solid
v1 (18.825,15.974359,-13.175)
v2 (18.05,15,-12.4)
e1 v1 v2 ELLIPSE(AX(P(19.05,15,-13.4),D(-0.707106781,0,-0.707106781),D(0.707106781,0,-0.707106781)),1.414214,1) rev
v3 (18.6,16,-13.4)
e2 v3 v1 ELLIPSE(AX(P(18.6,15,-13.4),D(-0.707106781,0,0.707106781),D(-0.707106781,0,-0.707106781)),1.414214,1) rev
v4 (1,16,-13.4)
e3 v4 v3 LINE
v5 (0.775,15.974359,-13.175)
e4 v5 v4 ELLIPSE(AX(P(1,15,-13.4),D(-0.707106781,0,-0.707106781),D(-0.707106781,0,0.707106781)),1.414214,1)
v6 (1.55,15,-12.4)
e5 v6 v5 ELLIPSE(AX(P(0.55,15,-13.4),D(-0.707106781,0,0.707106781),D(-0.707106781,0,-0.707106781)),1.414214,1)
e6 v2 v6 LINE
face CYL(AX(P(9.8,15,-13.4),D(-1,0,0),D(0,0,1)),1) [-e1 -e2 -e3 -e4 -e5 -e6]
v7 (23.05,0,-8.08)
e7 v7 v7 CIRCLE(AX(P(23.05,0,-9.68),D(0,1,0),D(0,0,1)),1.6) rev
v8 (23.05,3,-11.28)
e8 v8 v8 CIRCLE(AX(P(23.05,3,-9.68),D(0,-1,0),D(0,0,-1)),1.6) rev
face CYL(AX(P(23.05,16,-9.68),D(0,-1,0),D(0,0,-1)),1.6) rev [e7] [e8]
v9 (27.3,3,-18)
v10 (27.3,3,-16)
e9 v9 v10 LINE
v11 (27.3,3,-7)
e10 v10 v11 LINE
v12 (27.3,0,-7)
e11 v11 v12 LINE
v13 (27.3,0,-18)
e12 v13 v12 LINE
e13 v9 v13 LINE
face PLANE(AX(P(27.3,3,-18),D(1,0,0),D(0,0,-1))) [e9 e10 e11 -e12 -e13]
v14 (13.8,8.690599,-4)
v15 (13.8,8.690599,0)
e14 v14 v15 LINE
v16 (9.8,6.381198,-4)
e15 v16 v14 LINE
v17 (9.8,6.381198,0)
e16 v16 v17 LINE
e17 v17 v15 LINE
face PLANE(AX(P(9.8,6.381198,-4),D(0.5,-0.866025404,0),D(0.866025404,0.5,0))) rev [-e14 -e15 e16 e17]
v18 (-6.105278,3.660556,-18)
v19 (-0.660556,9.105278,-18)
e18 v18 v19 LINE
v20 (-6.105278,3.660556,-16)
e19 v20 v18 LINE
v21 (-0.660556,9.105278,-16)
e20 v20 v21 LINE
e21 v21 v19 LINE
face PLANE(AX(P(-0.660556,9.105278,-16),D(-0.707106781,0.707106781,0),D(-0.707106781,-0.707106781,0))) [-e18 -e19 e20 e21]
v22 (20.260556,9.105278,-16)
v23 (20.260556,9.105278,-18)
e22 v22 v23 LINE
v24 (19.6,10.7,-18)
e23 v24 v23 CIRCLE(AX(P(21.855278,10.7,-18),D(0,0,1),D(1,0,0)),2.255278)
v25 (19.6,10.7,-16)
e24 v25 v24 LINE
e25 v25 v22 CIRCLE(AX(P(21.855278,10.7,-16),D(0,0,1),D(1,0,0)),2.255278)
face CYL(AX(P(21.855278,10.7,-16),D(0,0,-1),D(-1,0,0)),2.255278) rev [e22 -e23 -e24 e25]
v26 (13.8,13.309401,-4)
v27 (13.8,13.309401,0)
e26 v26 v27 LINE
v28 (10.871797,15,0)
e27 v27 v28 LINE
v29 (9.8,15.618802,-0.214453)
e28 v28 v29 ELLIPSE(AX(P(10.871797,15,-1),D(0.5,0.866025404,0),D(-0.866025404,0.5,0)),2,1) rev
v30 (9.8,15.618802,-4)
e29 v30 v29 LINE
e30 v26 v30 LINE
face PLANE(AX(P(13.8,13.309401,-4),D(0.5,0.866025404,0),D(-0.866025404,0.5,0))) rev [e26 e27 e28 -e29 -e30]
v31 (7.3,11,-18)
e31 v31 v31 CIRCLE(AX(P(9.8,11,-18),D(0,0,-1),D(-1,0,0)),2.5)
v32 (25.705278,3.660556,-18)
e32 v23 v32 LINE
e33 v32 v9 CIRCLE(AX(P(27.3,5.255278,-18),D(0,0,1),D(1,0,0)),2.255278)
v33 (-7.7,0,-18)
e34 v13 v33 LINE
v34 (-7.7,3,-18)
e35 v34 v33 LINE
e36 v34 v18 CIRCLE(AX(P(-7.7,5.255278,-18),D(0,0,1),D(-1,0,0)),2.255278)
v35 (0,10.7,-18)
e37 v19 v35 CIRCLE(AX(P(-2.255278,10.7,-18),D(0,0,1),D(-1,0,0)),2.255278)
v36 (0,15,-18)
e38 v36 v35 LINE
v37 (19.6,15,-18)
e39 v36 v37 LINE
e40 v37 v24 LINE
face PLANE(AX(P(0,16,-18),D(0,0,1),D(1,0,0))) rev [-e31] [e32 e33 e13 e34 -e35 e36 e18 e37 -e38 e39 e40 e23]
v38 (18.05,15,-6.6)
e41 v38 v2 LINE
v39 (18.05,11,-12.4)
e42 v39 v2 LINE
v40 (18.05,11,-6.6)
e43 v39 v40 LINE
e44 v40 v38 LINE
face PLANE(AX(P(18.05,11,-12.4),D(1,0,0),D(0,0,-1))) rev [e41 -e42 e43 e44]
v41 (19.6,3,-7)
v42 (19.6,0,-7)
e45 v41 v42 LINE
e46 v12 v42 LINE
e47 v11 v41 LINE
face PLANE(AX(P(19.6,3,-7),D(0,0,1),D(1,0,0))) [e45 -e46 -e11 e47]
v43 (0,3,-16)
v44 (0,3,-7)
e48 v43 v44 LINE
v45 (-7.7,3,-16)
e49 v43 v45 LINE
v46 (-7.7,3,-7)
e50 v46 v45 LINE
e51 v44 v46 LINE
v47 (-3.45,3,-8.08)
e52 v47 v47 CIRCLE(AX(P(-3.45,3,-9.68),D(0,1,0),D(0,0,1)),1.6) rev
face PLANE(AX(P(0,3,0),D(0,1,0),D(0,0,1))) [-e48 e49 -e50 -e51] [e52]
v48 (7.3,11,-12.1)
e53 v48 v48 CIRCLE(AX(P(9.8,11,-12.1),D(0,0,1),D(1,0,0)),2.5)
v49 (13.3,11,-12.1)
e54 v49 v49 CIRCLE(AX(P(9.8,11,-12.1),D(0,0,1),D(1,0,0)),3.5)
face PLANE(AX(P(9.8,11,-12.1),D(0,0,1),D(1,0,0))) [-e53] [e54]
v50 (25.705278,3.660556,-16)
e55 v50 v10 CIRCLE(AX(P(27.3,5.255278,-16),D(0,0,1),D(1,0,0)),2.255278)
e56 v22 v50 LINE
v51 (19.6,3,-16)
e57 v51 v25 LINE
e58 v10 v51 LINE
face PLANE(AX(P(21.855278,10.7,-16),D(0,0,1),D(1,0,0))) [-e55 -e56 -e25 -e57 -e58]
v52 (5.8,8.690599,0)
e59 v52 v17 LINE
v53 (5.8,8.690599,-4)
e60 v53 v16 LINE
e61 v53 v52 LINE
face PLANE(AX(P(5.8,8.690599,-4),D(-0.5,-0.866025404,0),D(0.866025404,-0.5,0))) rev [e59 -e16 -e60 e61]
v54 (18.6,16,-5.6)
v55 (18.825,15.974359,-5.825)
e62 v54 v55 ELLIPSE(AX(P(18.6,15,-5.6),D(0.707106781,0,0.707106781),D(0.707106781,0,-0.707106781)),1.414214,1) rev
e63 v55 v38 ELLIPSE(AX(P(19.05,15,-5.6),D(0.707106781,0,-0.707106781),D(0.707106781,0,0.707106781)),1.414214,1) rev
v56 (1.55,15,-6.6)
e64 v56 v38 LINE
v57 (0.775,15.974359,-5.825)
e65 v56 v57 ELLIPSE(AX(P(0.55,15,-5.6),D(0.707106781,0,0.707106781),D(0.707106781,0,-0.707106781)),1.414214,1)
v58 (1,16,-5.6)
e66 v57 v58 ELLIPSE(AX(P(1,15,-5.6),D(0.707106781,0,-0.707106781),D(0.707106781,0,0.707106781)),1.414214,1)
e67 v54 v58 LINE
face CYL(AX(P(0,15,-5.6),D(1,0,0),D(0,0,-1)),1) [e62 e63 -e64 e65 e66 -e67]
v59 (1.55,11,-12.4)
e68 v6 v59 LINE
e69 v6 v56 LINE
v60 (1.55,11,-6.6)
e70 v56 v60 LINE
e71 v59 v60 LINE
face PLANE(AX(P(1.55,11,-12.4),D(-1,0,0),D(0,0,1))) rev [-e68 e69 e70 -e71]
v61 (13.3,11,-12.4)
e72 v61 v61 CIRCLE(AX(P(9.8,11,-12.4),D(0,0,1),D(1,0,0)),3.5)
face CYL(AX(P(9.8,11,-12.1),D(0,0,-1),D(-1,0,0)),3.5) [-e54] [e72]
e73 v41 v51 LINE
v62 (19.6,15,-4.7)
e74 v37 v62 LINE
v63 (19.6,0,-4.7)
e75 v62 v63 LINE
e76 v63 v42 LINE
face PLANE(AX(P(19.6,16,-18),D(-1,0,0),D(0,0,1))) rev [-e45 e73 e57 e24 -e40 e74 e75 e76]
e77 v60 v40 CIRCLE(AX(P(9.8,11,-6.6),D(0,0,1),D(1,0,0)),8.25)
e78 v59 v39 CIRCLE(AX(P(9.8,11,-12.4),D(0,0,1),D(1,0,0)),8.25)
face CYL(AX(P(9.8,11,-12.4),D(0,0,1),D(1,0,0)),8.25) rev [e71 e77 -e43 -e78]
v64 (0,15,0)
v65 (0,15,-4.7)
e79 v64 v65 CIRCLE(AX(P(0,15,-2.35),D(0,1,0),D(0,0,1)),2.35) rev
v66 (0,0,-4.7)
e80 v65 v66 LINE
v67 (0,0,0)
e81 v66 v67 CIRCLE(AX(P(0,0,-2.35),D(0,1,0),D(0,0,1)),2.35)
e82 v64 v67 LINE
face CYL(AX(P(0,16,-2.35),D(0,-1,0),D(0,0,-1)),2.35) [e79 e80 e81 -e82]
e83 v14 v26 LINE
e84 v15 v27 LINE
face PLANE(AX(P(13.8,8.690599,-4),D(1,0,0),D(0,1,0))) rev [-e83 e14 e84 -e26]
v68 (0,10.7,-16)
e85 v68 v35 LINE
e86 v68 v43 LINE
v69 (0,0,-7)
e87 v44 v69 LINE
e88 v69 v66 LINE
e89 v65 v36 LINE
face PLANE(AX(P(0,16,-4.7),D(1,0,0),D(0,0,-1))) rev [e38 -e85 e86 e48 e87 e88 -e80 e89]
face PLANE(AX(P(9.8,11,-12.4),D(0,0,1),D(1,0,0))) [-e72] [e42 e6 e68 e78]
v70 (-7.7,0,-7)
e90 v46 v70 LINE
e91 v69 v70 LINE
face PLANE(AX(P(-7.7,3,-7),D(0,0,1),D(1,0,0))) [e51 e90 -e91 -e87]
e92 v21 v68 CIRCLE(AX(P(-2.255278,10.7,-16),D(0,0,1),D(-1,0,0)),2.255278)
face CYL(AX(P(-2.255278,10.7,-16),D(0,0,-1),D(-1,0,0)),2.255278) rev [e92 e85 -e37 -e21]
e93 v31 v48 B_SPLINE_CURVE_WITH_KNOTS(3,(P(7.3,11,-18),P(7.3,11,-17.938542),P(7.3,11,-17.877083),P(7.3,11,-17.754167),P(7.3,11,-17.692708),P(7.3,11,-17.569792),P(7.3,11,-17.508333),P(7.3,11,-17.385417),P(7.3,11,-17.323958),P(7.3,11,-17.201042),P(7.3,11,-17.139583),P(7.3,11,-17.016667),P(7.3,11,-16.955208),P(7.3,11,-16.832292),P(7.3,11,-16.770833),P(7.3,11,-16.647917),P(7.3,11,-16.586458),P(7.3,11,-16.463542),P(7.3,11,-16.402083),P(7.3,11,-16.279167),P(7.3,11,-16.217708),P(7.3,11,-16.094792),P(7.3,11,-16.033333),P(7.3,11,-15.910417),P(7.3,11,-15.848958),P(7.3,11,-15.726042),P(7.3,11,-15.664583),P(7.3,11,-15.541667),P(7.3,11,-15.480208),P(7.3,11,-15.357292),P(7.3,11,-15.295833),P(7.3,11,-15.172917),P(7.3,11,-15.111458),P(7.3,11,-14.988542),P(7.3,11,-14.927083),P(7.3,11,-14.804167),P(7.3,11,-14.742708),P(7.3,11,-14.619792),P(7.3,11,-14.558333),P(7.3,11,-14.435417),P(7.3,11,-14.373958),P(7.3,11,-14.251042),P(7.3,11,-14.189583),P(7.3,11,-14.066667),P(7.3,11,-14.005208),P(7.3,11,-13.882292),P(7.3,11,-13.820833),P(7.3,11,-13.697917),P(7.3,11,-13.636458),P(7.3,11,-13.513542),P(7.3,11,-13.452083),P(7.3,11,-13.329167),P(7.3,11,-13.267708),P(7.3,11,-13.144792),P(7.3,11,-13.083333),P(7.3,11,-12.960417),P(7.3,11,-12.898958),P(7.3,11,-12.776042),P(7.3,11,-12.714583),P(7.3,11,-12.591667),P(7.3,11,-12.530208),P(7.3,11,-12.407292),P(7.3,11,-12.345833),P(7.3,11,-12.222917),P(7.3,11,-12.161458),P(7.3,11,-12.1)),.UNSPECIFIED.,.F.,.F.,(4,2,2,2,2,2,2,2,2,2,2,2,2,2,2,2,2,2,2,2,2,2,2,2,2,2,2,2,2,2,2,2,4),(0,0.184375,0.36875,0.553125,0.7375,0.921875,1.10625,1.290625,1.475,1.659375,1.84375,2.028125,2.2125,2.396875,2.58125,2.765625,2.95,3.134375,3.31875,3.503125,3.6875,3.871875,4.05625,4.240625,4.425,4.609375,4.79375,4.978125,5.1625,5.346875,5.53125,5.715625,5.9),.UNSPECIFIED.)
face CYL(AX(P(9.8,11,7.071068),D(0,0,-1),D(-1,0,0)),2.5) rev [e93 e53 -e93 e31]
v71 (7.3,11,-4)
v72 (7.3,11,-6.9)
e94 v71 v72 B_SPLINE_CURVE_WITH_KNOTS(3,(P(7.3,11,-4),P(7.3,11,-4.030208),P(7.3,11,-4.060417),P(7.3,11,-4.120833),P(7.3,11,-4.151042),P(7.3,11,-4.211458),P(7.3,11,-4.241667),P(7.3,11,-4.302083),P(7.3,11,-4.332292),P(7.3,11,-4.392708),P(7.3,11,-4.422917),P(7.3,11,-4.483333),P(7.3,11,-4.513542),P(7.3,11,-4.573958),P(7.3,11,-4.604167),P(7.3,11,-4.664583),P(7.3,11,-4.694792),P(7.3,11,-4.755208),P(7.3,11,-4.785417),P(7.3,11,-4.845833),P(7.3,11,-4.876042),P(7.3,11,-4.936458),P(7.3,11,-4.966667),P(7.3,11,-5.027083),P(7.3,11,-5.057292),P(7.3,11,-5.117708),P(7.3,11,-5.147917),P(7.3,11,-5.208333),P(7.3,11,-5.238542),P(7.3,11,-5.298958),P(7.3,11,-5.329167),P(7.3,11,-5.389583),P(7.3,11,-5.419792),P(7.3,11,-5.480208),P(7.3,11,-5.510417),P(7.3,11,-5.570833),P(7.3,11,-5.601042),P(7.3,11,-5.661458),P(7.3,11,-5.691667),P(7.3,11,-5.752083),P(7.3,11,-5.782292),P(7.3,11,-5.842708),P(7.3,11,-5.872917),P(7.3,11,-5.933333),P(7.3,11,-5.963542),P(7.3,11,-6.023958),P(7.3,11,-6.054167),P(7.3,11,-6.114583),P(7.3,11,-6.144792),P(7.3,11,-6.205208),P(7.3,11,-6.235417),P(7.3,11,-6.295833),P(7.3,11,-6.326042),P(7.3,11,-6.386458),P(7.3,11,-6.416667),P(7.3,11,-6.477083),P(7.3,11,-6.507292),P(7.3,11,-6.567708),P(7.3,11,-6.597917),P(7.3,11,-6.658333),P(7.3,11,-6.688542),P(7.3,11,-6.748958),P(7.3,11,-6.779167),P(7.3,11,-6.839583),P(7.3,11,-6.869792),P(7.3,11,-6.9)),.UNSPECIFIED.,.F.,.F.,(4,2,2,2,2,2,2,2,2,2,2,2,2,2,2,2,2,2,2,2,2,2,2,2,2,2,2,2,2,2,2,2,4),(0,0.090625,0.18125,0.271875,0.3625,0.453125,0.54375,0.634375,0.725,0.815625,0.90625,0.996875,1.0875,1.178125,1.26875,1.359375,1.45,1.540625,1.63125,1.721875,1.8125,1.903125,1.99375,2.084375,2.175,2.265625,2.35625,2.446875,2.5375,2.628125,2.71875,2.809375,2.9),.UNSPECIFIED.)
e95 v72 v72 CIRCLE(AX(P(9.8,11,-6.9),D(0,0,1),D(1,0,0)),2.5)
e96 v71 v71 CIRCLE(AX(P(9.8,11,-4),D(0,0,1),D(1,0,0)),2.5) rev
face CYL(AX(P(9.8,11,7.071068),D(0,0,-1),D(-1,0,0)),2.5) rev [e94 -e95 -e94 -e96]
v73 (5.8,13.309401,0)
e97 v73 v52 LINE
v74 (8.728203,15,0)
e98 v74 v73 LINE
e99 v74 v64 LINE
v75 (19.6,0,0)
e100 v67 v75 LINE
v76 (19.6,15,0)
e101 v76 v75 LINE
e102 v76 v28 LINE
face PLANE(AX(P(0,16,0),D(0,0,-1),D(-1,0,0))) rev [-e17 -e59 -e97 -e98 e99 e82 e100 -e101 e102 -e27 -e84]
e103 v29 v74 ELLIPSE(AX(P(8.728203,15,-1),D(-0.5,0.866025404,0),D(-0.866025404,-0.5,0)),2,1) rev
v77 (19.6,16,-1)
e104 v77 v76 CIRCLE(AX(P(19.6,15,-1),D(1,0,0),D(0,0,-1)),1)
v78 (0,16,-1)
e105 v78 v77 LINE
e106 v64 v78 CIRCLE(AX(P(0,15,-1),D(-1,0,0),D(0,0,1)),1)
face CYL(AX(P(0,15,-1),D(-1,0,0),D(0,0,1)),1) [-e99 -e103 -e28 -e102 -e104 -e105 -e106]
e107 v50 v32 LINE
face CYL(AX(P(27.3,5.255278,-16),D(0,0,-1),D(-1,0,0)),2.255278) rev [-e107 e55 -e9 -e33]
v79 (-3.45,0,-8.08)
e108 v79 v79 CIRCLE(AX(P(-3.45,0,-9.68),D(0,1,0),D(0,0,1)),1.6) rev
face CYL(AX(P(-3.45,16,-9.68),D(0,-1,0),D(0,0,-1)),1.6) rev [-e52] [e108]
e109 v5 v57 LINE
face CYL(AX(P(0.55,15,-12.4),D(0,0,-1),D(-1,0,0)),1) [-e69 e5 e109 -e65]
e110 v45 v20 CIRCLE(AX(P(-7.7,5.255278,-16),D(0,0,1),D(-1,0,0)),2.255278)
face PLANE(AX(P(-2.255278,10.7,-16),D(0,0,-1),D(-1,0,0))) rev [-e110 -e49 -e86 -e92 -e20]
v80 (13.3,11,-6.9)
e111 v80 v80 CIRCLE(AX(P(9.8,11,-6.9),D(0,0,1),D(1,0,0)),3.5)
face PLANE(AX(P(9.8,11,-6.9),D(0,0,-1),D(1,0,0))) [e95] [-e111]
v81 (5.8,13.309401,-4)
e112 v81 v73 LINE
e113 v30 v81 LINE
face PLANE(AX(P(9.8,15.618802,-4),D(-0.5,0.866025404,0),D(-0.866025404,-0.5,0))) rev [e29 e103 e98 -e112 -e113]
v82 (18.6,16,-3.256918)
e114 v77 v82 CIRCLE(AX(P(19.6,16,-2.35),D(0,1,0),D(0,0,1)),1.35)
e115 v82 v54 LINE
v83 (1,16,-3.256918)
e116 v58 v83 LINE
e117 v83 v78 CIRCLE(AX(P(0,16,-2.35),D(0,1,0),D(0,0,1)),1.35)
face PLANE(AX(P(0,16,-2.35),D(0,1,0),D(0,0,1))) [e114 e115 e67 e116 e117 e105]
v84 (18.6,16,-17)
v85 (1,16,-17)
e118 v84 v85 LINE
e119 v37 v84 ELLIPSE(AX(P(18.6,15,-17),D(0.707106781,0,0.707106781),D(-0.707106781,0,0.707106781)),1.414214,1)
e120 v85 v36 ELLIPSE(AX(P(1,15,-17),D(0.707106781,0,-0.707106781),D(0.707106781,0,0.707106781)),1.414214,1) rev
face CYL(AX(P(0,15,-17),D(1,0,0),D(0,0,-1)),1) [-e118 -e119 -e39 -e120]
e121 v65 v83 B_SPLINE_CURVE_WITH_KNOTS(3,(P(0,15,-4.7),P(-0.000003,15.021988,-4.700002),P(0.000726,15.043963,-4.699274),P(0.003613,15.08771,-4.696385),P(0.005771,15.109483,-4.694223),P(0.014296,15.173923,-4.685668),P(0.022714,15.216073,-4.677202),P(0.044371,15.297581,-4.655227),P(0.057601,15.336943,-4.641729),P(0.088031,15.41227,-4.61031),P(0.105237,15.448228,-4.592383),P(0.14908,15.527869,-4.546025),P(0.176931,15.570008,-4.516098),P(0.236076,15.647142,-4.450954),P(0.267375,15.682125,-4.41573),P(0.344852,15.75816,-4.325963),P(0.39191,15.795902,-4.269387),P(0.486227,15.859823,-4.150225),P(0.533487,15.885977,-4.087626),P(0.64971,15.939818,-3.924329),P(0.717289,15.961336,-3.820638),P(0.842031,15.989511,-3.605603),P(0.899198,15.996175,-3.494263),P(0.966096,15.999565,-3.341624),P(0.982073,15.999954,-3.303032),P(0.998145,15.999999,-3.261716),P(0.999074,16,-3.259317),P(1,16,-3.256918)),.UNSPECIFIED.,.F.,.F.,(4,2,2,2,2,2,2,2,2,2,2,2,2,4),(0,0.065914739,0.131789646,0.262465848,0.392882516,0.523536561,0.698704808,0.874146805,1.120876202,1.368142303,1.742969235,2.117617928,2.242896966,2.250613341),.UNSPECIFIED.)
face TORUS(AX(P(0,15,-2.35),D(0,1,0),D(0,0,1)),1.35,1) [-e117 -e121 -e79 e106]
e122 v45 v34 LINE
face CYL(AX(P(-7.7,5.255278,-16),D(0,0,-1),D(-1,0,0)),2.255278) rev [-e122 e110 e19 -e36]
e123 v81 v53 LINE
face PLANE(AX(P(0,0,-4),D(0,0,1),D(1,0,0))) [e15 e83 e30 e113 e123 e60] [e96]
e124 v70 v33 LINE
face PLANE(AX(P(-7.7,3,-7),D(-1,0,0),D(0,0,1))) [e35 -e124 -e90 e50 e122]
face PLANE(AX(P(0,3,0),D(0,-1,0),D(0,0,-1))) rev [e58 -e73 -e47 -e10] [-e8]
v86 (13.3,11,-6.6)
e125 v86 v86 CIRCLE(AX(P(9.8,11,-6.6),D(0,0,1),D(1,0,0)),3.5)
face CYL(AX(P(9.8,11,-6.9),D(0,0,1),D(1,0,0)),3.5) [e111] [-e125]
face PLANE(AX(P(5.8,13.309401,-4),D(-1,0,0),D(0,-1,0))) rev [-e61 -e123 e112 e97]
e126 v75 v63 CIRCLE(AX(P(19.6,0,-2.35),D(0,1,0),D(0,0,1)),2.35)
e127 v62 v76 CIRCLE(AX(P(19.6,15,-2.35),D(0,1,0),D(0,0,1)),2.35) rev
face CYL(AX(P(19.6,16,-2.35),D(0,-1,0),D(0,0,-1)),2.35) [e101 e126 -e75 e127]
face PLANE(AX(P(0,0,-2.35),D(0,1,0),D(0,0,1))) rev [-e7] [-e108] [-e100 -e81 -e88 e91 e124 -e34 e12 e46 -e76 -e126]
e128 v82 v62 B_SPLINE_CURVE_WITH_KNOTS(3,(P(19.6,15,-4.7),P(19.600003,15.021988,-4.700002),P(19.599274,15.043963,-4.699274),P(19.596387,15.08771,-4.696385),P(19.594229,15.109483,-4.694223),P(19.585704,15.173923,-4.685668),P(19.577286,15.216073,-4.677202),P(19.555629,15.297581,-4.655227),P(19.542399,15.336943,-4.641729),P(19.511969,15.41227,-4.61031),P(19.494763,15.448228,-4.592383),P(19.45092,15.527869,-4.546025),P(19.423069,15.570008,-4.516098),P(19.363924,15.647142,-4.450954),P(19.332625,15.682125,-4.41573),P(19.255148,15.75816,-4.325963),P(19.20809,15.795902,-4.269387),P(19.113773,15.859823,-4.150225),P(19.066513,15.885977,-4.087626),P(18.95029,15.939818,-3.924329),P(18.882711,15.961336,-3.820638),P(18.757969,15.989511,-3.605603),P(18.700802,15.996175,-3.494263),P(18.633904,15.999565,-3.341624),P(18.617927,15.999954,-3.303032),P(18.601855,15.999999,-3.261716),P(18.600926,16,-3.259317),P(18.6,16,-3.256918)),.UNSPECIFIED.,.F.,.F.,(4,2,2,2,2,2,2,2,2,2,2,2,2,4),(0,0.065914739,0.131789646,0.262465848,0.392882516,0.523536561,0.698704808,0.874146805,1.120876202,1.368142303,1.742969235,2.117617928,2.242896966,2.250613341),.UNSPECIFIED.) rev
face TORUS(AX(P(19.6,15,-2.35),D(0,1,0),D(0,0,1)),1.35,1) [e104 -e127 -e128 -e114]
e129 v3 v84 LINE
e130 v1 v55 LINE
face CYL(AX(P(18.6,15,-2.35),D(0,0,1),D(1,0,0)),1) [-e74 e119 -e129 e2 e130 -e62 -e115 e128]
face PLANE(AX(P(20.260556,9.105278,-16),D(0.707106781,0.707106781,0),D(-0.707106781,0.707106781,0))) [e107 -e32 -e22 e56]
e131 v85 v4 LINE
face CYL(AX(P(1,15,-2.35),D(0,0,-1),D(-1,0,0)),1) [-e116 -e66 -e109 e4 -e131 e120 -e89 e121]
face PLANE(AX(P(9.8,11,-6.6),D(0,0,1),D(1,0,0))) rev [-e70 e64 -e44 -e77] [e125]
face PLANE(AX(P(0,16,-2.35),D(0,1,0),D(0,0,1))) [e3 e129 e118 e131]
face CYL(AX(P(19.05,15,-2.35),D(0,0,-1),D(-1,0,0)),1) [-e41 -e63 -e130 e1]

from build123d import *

# Parameters (mm, degrees)
BOSS_EXTRUDE1_DEPTH            = 16
CUT_EXTRUDE4_START             = -6.6
CUT_EXTRUDE4_DEPTH             = 5.8
CUT_EXTRUDE5_REACH             = 34.585
SKETCH6_R                      = 2.5
CUT_EXTRUDE6_DEPTH             = 4
SKETCH8_R                      = 3.5
SKETCH8_R_2                    = 2.5
BOSS_EXTRUDE2_DEPTH            = 0.3
SKETCH9_W                      = 7.7
SKETCH9_H                      = 11
BOSS_EXTRUDE3_DEPTH            = 3
CUT_EXTRUDE7_REACH             = 37.189
SKETCH10_R                     = 1.6
CUT_EXTRUDE7_DIRECTION_2_DEPTH = 36.189344978
BOSS_EXTRUDE4_DEPTH            = 2
FILLET1_R                      = 1


with BuildPart() as part:
    # Sketch1 → Boss-Extrude1 (new body)
    with BuildSketch(Plane(origin=(0, 0, 0), x_dir=(1, 0, 0), z_dir=(0, 1, 0))):
        with BuildLine():
            Line((0, 0), (19.6, 0))
            ThreePointArc((19.6, 0), (21.95, 2.35), (19.6, 4.7))
            Line((19.6, 4.7), (19.6, 18))
            Line((19.6, 18), (0, 18))
            Line((0, 18), (0, 4.7))
            ThreePointArc((0, 4.7), (-2.35, 2.35), (0, 0))
        make_face()
    extrude(amount=BOSS_EXTRUDE1_DEPTH)

    # Sketch5 → Cut-Extrude4 (cut)
    with BuildSketch(Plane.XY.offset(CUT_EXTRUDE4_START)):
        with BuildLine():
            Line((1.55, 11), (1.55, 16))
            Line((1.55, 16), (18.05, 16))
            Line((18.05, 16), (18.05, 11))
            ThreePointArc((18.05, 11), (9.8, 2.75), (1.55, 11))
        make_face()
    extrude(amount=-CUT_EXTRUDE4_DEPTH, mode=Mode.SUBTRACT)

    # Cut-Extrude5: up to this face of the body (flat: up to its plane)
    cut_extrude5_end = Plane(part.part.faces().sort_by_distance((9.8, 8, 0))[0])
    # Sketch6 → Cut-Extrude5 (cut, up to the picked face)
    with BuildSketch(Plane(origin=(0, 0, -18), x_dir=(-1, 0, 0), z_dir=(0, 0, -1)), mode=Mode.PRIVATE) as cut_extrude5_sk1:
        with Locations((-9.8, 11)):
            Circle(SKETCH6_R)
    cut_extrude5_tool1 = split(extrude(cut_extrude5_sk1.sketch, amount=-CUT_EXTRUDE5_REACH, mode=Mode.PRIVATE), bisect_by=cut_extrude5_end, keep=Keep.BOTH, mode=Mode.PRIVATE)
    add(cut_extrude5_tool1.solids().sort_by(Axis((9.8, 11, -18), (0, 0, 1)))[0], mode=Mode.SUBTRACT)

    # Sketch7 → Cut-Extrude6 (cut)
    with BuildSketch(Plane.XY):
        Polygon((9.8, 15.618802154), (5.8, 13.309401077), (5.8, 8.690598923), (9.8, 6.381197846), (13.8, 8.690598923), (13.8, 13.309401077), align=None)
    extrude(amount=-CUT_EXTRUDE6_DEPTH, mode=Mode.SUBTRACT)

    # Sketch8 → Boss-Extrude2 (add)
    with BuildSketch(Plane.XY.offset(-12.4)):
        with Locations((9.8, 11)):
            Circle(SKETCH8_R)
        with Locations(Location((9.8, 11, 0), (0, 0, 180))):
            Circle(SKETCH8_R_2, mode=Mode.SUBTRACT)
    boss_extrude2 = extrude(amount=BOSS_EXTRUDE2_DEPTH)

    # Mirror1: Boss-Extrude2 across plane
    add(boss_extrude2.mirror(Plane.XY.offset(-9.5)))

    # Sketch9 → Boss-Extrude3 (add)
    with BuildSketch(Plane.XZ):
        with Locations((-3.85, -12.5)):
            Rectangle(SKETCH9_W, SKETCH9_H)
        with Locations((23.45, -12.5)):
            Rectangle(SKETCH9_W, SKETCH9_H)
    extrude(amount=-BOSS_EXTRUDE3_DEPTH)

    # Sketch10 → Cut-Extrude7 (cut, up to next)
    with BuildSketch(Plane(origin=(0, 3, 0), x_dir=(1, 0, 0), z_dir=(0, 1, 0)), mode=Mode.PRIVATE) as cut_extrude7_sk1:
        with Locations(Location((-3.45, 9.68, 0), (0, 0, 270))):
            Circle(SKETCH10_R)
    cut_extrude7_tool1 = extrude(cut_extrude7_sk1.sketch, amount=-CUT_EXTRUDE7_REACH, mode=Mode.PRIVATE) & part.part
    # Sketch10 → Cut-Extrude7 (cut, up to next)
    with BuildSketch(Plane(origin=(0, 3, 0), x_dir=(1, 0, 0), z_dir=(0, 1, 0)), mode=Mode.PRIVATE) as cut_extrude7_sk2:
        with Locations(Location((23.05, 9.68, 0), (0, 0, 90))):
            Circle(SKETCH10_R)
    cut_extrude7_tool2 = extrude(cut_extrude7_sk2.sketch, amount=-CUT_EXTRUDE7_REACH, mode=Mode.PRIVATE) & part.part
    add(cut_extrude7_tool1.solids().sort_by_distance((-3.45, 3, -9.68))[0], mode=Mode.SUBTRACT)
    add(cut_extrude7_tool2.solids().sort_by_distance((23.05, 3, -9.68))[0], mode=Mode.SUBTRACT)

    # Sketch10 → Cut-Extrude7 direction 2 (cut)
    with BuildSketch(Plane(origin=(0, 3, 0), x_dir=(1, 0, 0), z_dir=(0, 1, 0))):
        with Locations(Location((-3.45, 9.68, 0), (0, 0, 270))):
            Circle(SKETCH10_R)
        with Locations(Location((23.05, 9.68, 0), (0, 0, 90))):
            Circle(SKETCH10_R)
    extrude(amount=CUT_EXTRUDE7_DIRECTION_2_DEPTH, mode=Mode.SUBTRACT)

    # Sketch12 → Boss-Extrude4 (add)
    with BuildSketch(Plane(origin=(0, 0, -18), x_dir=(-1, 0, 0), z_dir=(0, 0, -1))):
        with BuildLine():
            Line((-19.6, 3), (-27.3, 3))
            ThreePointArc((-27.3, 3), (-26.436942556, 3.171672799), (-25.705277785, 3.66055557))
            Line((-25.705277785, 3.66055557), (-20.26055557, 9.105277785))
            ThreePointArc((-20.26055557, 9.105277785), (-19.771672799, 9.836942556), (-19.6, 10.7))
            Line((-19.6, 10.7), (-19.6, 3))
        make_face()
        with BuildLine():
            Line((0, 10.7), (0, 3))
            Line((0, 3), (7.7, 3))
            ThreePointArc((7.7, 3), (6.836942556, 3.171672799), (6.105277785, 3.66055557))
            Line((6.105277785, 3.66055557), (0.66055557, 9.105277785))
            ThreePointArc((0.66055557, 9.105277785), (0.171672799, 9.836942556), (0, 10.7))
        make_face()
    extrude(amount=-BOSS_EXTRUDE4_DEPTH)

    # Fillet1
    # the kernel refuses this fillet: 1 mm, written as the material it takes off along each edge
    with BuildSketch(Plane(origin=(19.6, 16, -2.35), x_dir=(0, 0, 1), z_dir=(-1, 0, 0))) as fillet1_piece_1:
        with BuildLine():
            CenterArc((2.35 - FILLET1_R, -FILLET1_R), FILLET1_R, 0, 90)
            Line((2.35, -FILLET1_R), (2.35, 0))
            Line((2.35, 0), (2.35 - FILLET1_R, 0))
        make_face()
    revolve(axis=Axis((19.6, 16, -2.35), (0, 1, 0)), revolution_arc=180, mode=Mode.SUBTRACT)
    with BuildSketch(Plane(origin=(19.6, 16, -2.2), x_dir=(-1, 0, 0), z_dir=(0, 0, -1))) as fillet1_piece_2_section:
        with BuildLine():
            CenterArc((FILLET1_R, -FILLET1_R), FILLET1_R, 90, 90)
            Line((0, -FILLET1_R), (0, 0))
            Line((0, 0), (FILLET1_R, 0))
        make_face()
    fillet1_piece_2 = extrude(amount=18.3, mode=Mode.PRIVATE)
    fillet1_piece_2 = fillet1_piece_2 - Plane(origin=(19.6, 15.773826921, -2.35), x_dir=(0, 0, 1), z_dir=(0, -1, 0)) * Cylinder(2.35, 41, mode=Mode.PRIVATE)
    add(fillet1_piece_2, mode=Mode.SUBTRACT)
    with BuildSketch(Plane(origin=(22.1, 16, -18), x_dir=(0, 0, 1), z_dir=(-1, 0, 0))) as fillet1_piece_3:
        with BuildLine():
            CenterArc((FILLET1_R, -FILLET1_R), FILLET1_R, 90, 90)
            Line((0, -FILLET1_R), (0, 0))
            Line((0, 0), (FILLET1_R, 0))
        make_face()
    extrude(amount=24.6, mode=Mode.SUBTRACT)
    with BuildSketch(Plane(origin=(0, 16, -20.5), x_dir=(1, 0, 0), z_dir=(0, 0, 1))) as fillet1_piece_4_section:
        with BuildLine():
            CenterArc((FILLET1_R, -FILLET1_R), FILLET1_R, 90, 90)
            Line((0, -FILLET1_R), (0, 0))
            Line((0, 0), (FILLET1_R, 0))
        make_face()
    fillet1_piece_4 = extrude(amount=18.3, mode=Mode.PRIVATE)
    fillet1_piece_4 = fillet1_piece_4 - Plane(origin=(0, 15.773826886, -2.35), x_dir=(0, 0, -1), z_dir=(0, -1, 0)) * Cylinder(2.35, 41, mode=Mode.PRIVATE)
    add(fillet1_piece_4, mode=Mode.SUBTRACT)
    with BuildSketch(Plane(origin=(1.55, 16, -12.4), x_dir=(0, 0, -1), z_dir=(1, 0, 0))) as fillet1_piece_5:
        with BuildLine():
            CenterArc((FILLET1_R, -FILLET1_R), FILLET1_R, 90, 90)
            Line((0, -FILLET1_R), (0, 0))
            Line((0, 0), (FILLET1_R, 0))
        make_face()
    extrude(amount=16.5, mode=Mode.SUBTRACT)
    with BuildSketch(Plane(origin=(1.55, 16, -6.6), x_dir=(-1, 0, 0), z_dir=(0, 0, -1))) as fillet1_piece_6:
        with BuildLine():
            CenterArc((FILLET1_R, -FILLET1_R), FILLET1_R, 90, 90)
            Line((0, -FILLET1_R), (0, 0))
            Line((0, 0), (FILLET1_R, 0))
        make_face()
    extrude(amount=5.8, mode=Mode.SUBTRACT)
    with BuildSketch(Plane(origin=(18.05, 16, -6.6), x_dir=(1, 0, 0), z_dir=(0, 0, -1))) as fillet1_piece_7:
        with BuildLine():
            CenterArc((FILLET1_R, FILLET1_R), FILLET1_R, 180, 90)
            Line((0, FILLET1_R), (0, 0))
            Line((0, 0), (FILLET1_R, 0))
        make_face()
    extrude(amount=5.8, mode=Mode.SUBTRACT)
    with BuildSketch(Plane(origin=(1.55, 16, -6.6), x_dir=(0, 0, 1), z_dir=(1, 0, 0))) as fillet1_piece_8:
        with BuildLine():
            CenterArc((FILLET1_R, FILLET1_R), FILLET1_R, 180, 90)
            Line((0, FILLET1_R), (0, 0))
            Line((0, 0), (FILLET1_R, 0))
        make_face()
    extrude(amount=16.5, mode=Mode.SUBTRACT)
    with BuildSketch(Plane(origin=(0, 16, -2.35), x_dir=(0, 0, -1), z_dir=(1, 0, 0))) as fillet1_piece_9:
        with BuildLine():
            CenterArc((2.35 - FILLET1_R, -FILLET1_R), FILLET1_R, 0, 90)
            Line((2.35 - FILLET1_R, 0), (2.35, 0))
            Line((2.35, 0), (2.35, -FILLET1_R))
        make_face()
    revolve(axis=Axis((0, 16, -2.35), (0, 1, 0)), revolution_arc=180, mode=Mode.SUBTRACT)
    with BuildSketch(Plane(origin=(0, 16, 0), x_dir=(0, -1, 0), z_dir=(1, 0, 0))) as fillet1_piece_10:
        with BuildLine():
            CenterArc((FILLET1_R, FILLET1_R), FILLET1_R, 180, 90)
            Line((0, FILLET1_R), (0, 0))
            Line((0, 0), (FILLET1_R, 0))
        make_face()
    extrude(amount=19.6, mode=Mode.SUBTRACT)
    with BuildSketch(Plane(origin=(19.6, 16, -2.35), x_dir=(0, 0, 1), z_dir=(-1, 0, 0))) as fillet1_piece_11a_section:
        with BuildLine():
            CenterArc((2.35 - FILLET1_R, -FILLET1_R), FILLET1_R, 0, 90)
            Line((2.35, -FILLET1_R), (2.35, 0))
            Line((2.35, 0), (2.35 - FILLET1_R, 0))
        make_face()
    fillet1_piece_11a = revolve(axis=Axis((19.6, 16, -2.35), (0, 1, 0)), revolution_arc=241.050980809, mode=Mode.PRIVATE)
    fillet1_piece_11a = split(fillet1_piece_11a, bisect_by=Plane(origin=(19.6, 15.760675593, -4.111934827), z_dir=(-1, 0, 0)), keep=Keep.TOP, mode=Mode.PRIVATE)
    with BuildSketch(Plane(origin=(19.6, 16, -2.2), x_dir=(-1, 0, 0), z_dir=(0, 0, -1))) as fillet1_piece_11b_section:
        with BuildLine():
            CenterArc((FILLET1_R, -FILLET1_R), FILLET1_R, 90, 90)
            Line((0, -FILLET1_R), (0, 0))
            Line((0, 0), (FILLET1_R, 0))
        make_face()
    fillet1_piece_11b = extrude(amount=18.3, mode=Mode.PRIVATE)
    fillet1_piece_11b = fillet1_piece_11b & Plane(origin=(19.6, 15.772187807, -2.35), x_dir=(0, 0, 1), z_dir=(0, -1, 0)) * Cylinder(2.35, 41, mode=Mode.PRIVATE)
    fillet1_piece_11 = fillet1_piece_11a & fillet1_piece_11b
    add(fillet1_piece_11, mode=Mode.SUBTRACT)
    with BuildSketch(Plane(origin=(0, 16, -2.35), x_dir=(0.8750507362013609, 0, -0.4840312067144602), z_dir=(0.4840312067144602, 0, 0.8750507362013609))) as fillet1_piece_12a_section:
        with BuildLine():
            CenterArc((2.35 - FILLET1_R, -FILLET1_R), FILLET1_R, 0, 90)
            Line((2.35 - FILLET1_R, 0), (2.35, 0))
            Line((2.35, 0), (2.35, -FILLET1_R))
        make_face()
    fillet1_piece_12a = revolve(axis=Axis((0, 16, -2.35), (0, 1, 0)), revolution_arc=241.050980809, mode=Mode.PRIVATE)
    fillet1_piece_12a = split(fillet1_piece_12a, bisect_by=Plane(origin=(0, 15.760675593, -4.111934827), z_dir=(1, 0, 0)), keep=Keep.TOP, mode=Mode.PRIVATE)
    with BuildSketch(Plane(origin=(0, 16, -20.5), x_dir=(1, 0, 0), z_dir=(0, 0, 1))) as fillet1_piece_12b_section:
        with BuildLine():
            CenterArc((FILLET1_R, -FILLET1_R), FILLET1_R, 90, 90)
            Line((0, -FILLET1_R), (0, 0))
            Line((0, 0), (FILLET1_R, 0))
        make_face()
    fillet1_piece_12b = extrude(amount=18.3, mode=Mode.PRIVATE)
    fillet1_piece_12b = fillet1_piece_12b & Plane(origin=(0, 15.772187772, -2.35), x_dir=(0, 0, -1), z_dir=(0, -1, 0)) * Cylinder(2.35, 41, mode=Mode.PRIVATE)
    fillet1_piece_12 = fillet1_piece_12a & fillet1_piece_12b
    add(fillet1_piece_12, mode=Mode.SUBTRACT)
    with BuildSketch(Plane(origin=(-0.95, 16, -12.4), x_dir=(0, 0, -1), z_dir=(1, 0, 0))) as fillet1_piece_13a_section:
        with BuildLine():
            CenterArc((FILLET1_R, -FILLET1_R), FILLET1_R, 90, 90)
            Line((0, -FILLET1_R), (0, 0))
            Line((0, 0), (FILLET1_R, 0))
        make_face()
    fillet1_piece_13a = extrude(amount=19, mode=Mode.PRIVATE)
    fillet1_piece_13a = split(fillet1_piece_13a, bisect_by=Plane(origin=(1.55, 15.773604886, -12.626395114), z_dir=(-1, 0, 0)), keep=Keep.TOP, mode=Mode.PRIVATE)
    with BuildSketch(Plane(origin=(1.55, 16, -6.6), x_dir=(-1, 0, 0), z_dir=(0, 0, -1))) as fillet1_piece_13b_section:
        with BuildLine():
            CenterArc((FILLET1_R, -FILLET1_R), FILLET1_R, 90, 90)
            Line((0, -FILLET1_R), (0, 0))
            Line((0, 0), (FILLET1_R, 0))
        make_face()
    fillet1_piece_13b = extrude(amount=8.3, mode=Mode.PRIVATE)
    fillet1_piece_13b = split(fillet1_piece_13b, bisect_by=Plane(origin=(1.323604886, 15.773604886, -12.4), z_dir=(0, 0, -1)), keep=Keep.TOP, mode=Mode.PRIVATE)
    fillet1_piece_13 = fillet1_piece_13a & fillet1_piece_13b
    add(fillet1_piece_13, mode=Mode.SUBTRACT)
    with BuildSketch(Plane(origin=(18.05, 16, -6.6), x_dir=(1, 0, 0), z_dir=(0, 0, -1))) as fillet1_piece_14a_section:
        with BuildLine():
            CenterArc((FILLET1_R, FILLET1_R), FILLET1_R, 180, 90)
            Line((0, FILLET1_R), (0, 0))
            Line((0, 0), (FILLET1_R, 0))
        make_face()
    fillet1_piece_14a = extrude(amount=8.3, mode=Mode.PRIVATE)
    fillet1_piece_14a = split(fillet1_piece_14a, bisect_by=Plane(origin=(18.276395114, 15.773604886, -12.4), z_dir=(0, 0, -1)), keep=Keep.TOP, mode=Mode.PRIVATE)
    with BuildSketch(Plane(origin=(1.55, 16, -12.4), x_dir=(0, 0, -1), z_dir=(1, 0, 0))) as fillet1_piece_14b_section:
        with BuildLine():
            CenterArc((FILLET1_R, -FILLET1_R), FILLET1_R, 90, 90)
            Line((0, -FILLET1_R), (0, 0))
            Line((0, 0), (FILLET1_R, 0))
        make_face()
    fillet1_piece_14b = extrude(amount=19, mode=Mode.PRIVATE)
    fillet1_piece_14b = split(fillet1_piece_14b, bisect_by=Plane(origin=(18.05, 15.773604886, -12.626395114), z_dir=(1, 0, 0)), keep=Keep.TOP, mode=Mode.PRIVATE)
    fillet1_piece_14 = fillet1_piece_14a & fillet1_piece_14b
    add(fillet1_piece_14, mode=Mode.SUBTRACT)
    with BuildSketch(Plane(origin=(-0.95, 16, -6.6), x_dir=(0, 0, 1), z_dir=(1, 0, 0))) as fillet1_piece_15a_section:
        with BuildLine():
            CenterArc((FILLET1_R, FILLET1_R), FILLET1_R, 180, 90)
            Line((0, FILLET1_R), (0, 0))
            Line((0, 0), (FILLET1_R, 0))
        make_face()
    fillet1_piece_15a = extrude(amount=19, mode=Mode.PRIVATE)
    fillet1_piece_15a = split(fillet1_piece_15a, bisect_by=Plane(origin=(1.55, 15.773604886, -6.373604886), z_dir=(-1, 0, 0)), keep=Keep.TOP, mode=Mode.PRIVATE)
    with BuildSketch(Plane(origin=(1.55, 16, -4.1), x_dir=(-1, 0, 0), z_dir=(0, 0, -1))) as fillet1_piece_15b_section:
        with BuildLine():
            CenterArc((FILLET1_R, -FILLET1_R), FILLET1_R, 90, 90)
            Line((0, -FILLET1_R), (0, 0))
            Line((0, 0), (FILLET1_R, 0))
        make_face()
    fillet1_piece_15b = extrude(amount=8.3, mode=Mode.PRIVATE)
    fillet1_piece_15b = split(fillet1_piece_15b, bisect_by=Plane(origin=(1.323604886, 15.773604886, -6.6), z_dir=(0, 0, 1)), keep=Keep.TOP, mode=Mode.PRIVATE)
    fillet1_piece_15 = fillet1_piece_15a & fillet1_piece_15b
    add(fillet1_piece_15, mode=Mode.SUBTRACT)
    with BuildSketch(Plane(origin=(1.55, 16, -6.6), x_dir=(0, 0, 1), z_dir=(1, 0, 0))) as fillet1_piece_16a_section:
        with BuildLine():
            CenterArc((FILLET1_R, FILLET1_R), FILLET1_R, 180, 90)
            Line((0, FILLET1_R), (0, 0))
            Line((0, 0), (FILLET1_R, 0))
        make_face()
    fillet1_piece_16a = extrude(amount=19, mode=Mode.PRIVATE)
    fillet1_piece_16a = split(fillet1_piece_16a, bisect_by=Plane(origin=(18.05, 15.773604886, -6.373604886), z_dir=(1, 0, 0)), keep=Keep.TOP, mode=Mode.PRIVATE)
    with BuildSketch(Plane(origin=(18.05, 16, -4.1), x_dir=(1, 0, 0), z_dir=(0, 0, -1))) as fillet1_piece_16b_section:
        with BuildLine():
            CenterArc((FILLET1_R, FILLET1_R), FILLET1_R, 180, 90)
            Line((0, FILLET1_R), (0, 0))
            Line((0, 0), (FILLET1_R, 0))
        make_face()
    fillet1_piece_16b = extrude(amount=8.3, mode=Mode.PRIVATE)
    fillet1_piece_16b = split(fillet1_piece_16b, bisect_by=Plane(origin=(18.276395114, 15.773604886, -6.6), z_dir=(0, 0, 1)), keep=Keep.TOP, mode=Mode.PRIVATE)
    fillet1_piece_16 = fillet1_piece_16a & fillet1_piece_16b
    add(fillet1_piece_16, mode=Mode.SUBTRACT)


solid = part.part
